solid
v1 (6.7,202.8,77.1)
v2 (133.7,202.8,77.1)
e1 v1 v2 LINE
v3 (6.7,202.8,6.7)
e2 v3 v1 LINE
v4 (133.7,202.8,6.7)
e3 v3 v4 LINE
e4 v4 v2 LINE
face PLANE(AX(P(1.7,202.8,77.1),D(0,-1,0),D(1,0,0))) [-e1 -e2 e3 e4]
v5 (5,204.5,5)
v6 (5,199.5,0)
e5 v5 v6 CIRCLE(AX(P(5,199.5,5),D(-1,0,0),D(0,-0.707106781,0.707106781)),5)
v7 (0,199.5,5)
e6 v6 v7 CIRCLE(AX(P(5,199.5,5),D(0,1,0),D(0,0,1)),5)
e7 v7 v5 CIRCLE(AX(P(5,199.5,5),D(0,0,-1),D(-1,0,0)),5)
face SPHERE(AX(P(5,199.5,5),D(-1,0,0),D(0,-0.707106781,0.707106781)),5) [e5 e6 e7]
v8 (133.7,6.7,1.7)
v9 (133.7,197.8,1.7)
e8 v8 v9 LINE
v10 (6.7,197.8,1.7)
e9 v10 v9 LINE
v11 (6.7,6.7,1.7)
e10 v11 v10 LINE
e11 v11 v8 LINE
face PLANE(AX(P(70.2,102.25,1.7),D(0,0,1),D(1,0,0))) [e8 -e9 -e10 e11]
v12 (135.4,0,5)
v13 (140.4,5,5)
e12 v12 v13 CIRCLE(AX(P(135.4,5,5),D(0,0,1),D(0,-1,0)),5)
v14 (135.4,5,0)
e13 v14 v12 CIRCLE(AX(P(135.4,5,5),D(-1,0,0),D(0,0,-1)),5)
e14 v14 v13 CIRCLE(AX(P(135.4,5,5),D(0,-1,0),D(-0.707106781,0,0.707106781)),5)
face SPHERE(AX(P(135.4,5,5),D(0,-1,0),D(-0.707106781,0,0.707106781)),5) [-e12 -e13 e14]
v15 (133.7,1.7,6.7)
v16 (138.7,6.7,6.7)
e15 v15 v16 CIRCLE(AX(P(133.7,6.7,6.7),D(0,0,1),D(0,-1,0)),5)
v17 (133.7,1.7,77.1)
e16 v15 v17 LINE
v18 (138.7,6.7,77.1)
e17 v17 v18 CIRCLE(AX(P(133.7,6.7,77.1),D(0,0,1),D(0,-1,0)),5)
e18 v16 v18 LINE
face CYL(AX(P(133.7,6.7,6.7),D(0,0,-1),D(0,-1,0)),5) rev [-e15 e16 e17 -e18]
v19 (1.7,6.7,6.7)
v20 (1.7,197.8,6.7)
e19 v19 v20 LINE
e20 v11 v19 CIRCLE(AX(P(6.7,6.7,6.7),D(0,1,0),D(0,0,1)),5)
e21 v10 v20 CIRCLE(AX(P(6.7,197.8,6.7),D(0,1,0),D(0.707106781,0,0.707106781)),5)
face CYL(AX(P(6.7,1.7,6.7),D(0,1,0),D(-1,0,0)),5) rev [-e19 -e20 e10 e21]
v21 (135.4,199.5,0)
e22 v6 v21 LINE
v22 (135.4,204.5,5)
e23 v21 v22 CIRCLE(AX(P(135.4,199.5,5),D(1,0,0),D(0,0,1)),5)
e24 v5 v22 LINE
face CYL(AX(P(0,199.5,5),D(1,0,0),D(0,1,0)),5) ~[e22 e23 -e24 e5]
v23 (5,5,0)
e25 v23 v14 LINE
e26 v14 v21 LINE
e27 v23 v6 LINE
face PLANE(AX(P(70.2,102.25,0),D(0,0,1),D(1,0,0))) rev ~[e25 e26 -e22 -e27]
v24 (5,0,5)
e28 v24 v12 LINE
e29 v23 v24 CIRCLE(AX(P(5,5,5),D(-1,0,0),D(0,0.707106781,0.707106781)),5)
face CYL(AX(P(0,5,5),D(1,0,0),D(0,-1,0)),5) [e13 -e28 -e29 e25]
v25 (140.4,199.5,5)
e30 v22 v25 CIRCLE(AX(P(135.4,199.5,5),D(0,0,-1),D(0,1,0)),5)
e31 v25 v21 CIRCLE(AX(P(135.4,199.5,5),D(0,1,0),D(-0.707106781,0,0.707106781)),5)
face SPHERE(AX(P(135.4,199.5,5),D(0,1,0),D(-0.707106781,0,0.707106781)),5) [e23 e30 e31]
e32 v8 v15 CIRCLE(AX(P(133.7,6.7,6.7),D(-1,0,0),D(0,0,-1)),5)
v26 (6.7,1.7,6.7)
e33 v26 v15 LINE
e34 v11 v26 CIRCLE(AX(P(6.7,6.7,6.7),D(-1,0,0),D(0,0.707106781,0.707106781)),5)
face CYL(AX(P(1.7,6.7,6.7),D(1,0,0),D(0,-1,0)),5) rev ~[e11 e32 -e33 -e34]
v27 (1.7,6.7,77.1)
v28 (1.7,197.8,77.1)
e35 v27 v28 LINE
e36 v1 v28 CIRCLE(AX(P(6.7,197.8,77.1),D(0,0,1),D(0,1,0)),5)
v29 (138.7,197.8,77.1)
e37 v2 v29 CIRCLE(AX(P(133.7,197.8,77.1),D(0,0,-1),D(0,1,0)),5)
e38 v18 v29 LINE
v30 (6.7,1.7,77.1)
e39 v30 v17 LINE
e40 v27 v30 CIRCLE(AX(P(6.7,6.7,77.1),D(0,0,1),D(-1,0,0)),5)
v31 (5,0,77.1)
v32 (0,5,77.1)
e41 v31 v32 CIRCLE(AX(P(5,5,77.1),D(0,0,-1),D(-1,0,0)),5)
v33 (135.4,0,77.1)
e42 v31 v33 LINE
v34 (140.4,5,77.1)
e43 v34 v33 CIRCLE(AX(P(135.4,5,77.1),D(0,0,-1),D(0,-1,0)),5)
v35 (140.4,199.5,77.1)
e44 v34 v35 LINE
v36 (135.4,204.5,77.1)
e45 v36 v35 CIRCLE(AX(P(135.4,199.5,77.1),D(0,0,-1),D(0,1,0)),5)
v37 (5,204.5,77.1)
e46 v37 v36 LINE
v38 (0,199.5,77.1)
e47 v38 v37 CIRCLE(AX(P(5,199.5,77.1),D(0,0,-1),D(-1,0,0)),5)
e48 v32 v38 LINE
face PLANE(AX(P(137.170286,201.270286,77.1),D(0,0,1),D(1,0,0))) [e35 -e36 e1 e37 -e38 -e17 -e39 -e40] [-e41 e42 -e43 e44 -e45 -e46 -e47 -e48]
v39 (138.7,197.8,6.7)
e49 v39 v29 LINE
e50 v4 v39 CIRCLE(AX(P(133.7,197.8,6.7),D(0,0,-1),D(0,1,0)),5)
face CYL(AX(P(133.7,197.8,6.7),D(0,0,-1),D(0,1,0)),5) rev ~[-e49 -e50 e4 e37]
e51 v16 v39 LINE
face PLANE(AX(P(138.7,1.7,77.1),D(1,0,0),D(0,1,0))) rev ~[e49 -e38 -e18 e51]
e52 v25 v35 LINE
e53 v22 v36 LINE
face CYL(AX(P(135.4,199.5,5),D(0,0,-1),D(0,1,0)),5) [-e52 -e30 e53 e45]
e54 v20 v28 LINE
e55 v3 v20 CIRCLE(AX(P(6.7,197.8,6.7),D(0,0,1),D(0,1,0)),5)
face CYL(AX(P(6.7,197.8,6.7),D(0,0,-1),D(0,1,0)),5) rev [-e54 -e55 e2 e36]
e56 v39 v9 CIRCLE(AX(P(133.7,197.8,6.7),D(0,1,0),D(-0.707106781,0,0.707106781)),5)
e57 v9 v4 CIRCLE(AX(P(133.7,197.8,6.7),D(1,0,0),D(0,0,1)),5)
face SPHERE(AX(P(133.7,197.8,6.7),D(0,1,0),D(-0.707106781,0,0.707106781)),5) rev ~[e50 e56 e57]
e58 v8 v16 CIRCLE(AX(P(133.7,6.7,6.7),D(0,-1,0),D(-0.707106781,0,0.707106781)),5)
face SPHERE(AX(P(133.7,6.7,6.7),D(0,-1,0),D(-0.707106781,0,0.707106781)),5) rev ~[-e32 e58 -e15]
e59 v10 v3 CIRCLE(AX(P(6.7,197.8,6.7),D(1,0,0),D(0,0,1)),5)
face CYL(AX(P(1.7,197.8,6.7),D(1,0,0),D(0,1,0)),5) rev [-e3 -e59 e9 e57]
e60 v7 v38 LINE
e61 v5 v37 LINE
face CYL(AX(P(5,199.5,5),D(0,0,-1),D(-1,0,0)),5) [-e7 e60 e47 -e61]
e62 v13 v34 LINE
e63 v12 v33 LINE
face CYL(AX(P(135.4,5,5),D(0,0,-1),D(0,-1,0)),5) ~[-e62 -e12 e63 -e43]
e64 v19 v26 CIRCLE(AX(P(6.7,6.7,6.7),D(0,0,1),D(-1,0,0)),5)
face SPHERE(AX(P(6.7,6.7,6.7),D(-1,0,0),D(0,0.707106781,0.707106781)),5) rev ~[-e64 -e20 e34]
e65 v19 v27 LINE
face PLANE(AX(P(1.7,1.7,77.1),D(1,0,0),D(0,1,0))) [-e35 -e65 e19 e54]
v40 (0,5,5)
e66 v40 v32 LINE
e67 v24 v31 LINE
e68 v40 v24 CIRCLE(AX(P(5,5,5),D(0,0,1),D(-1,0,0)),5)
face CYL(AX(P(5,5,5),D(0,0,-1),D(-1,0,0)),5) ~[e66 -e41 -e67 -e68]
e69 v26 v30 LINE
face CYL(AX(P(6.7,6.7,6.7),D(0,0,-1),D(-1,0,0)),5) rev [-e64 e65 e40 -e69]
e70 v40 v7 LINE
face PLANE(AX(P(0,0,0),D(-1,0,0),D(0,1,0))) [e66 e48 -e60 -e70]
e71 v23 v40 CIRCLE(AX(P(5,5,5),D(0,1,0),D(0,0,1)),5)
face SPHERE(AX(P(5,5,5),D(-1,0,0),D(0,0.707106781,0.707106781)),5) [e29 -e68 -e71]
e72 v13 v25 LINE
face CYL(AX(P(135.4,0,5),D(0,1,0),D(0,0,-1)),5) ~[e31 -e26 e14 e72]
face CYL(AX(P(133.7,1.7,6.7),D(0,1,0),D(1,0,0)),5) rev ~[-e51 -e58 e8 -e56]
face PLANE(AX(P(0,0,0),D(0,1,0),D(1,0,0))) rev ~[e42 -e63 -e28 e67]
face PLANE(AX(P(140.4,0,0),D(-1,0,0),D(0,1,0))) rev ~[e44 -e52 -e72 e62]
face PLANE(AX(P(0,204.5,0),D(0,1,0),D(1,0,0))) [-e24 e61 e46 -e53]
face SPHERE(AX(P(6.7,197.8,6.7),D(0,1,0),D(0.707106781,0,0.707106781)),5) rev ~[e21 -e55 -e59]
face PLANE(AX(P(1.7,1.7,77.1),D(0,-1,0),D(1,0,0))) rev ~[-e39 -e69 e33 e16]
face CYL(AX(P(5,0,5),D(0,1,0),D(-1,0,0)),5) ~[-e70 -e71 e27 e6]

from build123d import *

# Parameters (mm, degrees)
F0_W         = 140.4
F0_H         = 204.5
F1_DEPTH     = 77.1
F2_W         = 137
F2_H         = 201.1
F3_DEPTH     = 75.4
F4_R         = 5
F5_T1_DEPTH  = 70.4
F5_S5_W      = 5
F5_S5_H      = 5
F5_T6_DEPTH  = 5
F5_S11_W     = 5
F5_S11_H     = 5
F5_T12_DEPTH = 5
F5_S17_W     = 5
F5_S17_H     = 5
F5_T18_DEPTH = 5
F5_S23_W     = 5
F5_S23_H     = 5
F5_T24_DEPTH = 5
F5_T27_DEPTH = 84.6
F5_S31_W     = 5
F5_S31_H     = 5
F5_T32_DEPTH = 5
F5_S37_W     = 5
F5_S37_H     = 5
F5_T38_DEPTH = 5
F5_S43_W     = 5
F5_S43_H     = 5
F5_T44_DEPTH = 5
F5_S49_W     = 5
F5_S49_H     = 5
F5_T50_DEPTH = 5


# Not quite as in the source:
# - a fillet or chamfer that OpenCascade refuses, or shapes differently, is made with other operations: its cross-section is extruded or revolved along the edge and cut away or added


with BuildPart() as f1:
    # F0 (on Top) → F1 (new body)
    with BuildSketch(Plane.XY):
        with Locations((70.2, 102.25)):
            Rectangle(F0_W, F0_H)
    extrude(amount=F1_DEPTH)

    # F2 (on face) → F3 (cut)
    with BuildSketch(Plane.XY.offset(77.1)):
        with Locations((70.2, 102.25)):
            Rectangle(F2_W, F2_H)
    extrude(amount=-F3_DEPTH, mode=Mode.SUBTRACT)

    # F4
    f4_edges = [f1.edges().sort_by_distance(p)[0] for p in [
        (70.2, 202.8, 1.7),
        (1.7, 102.25, 1.7),
        (70.2, 1.7, 1.7),
        (138.7, 102.25, 1.7),
        (0, 102.25, 0),
        (70.2, 0, 0),
        (140.4, 102.25, 0),
        (70.2, 204.5, 0),
    ]]
    fillet(f4_edges, radius=F4_R)

    # F5: fillet of radius 5 on 8 edges, made by hand

    # F5_s2 → F5_t1 (join)
    with BuildSketch(Plane.XY.offset(6.7)):
        with BuildLine():
            ThreePointArc((133.7, 202.8), (137.2355339059, 201.3355339059), (138.7, 197.8))
            Line((138.7, 197.8), (138.7, 202.8))
            Line((138.7, 202.8), (133.7, 202.8))
        make_face()
        with BuildLine():
            ThreePointArc((6.7, 202.8), (3.1644660941, 201.3355339059), (1.7, 197.8))
            Line((1.7, 197.8), (1.7, 202.8))
            Line((1.7, 202.8), (6.7, 202.8))
        make_face()
        with BuildLine():
            ThreePointArc((1.7, 6.7), (3.1644660941, 3.1644660941), (6.7, 1.7))
            Line((6.7, 1.7), (1.7, 1.7))
            Line((1.7, 1.7), (1.7, 6.7))
        make_face()
        with BuildLine():
            ThreePointArc((133.7, 1.7), (137.2355339059, 3.1644660941), (138.7, 6.7))
            Line((138.7, 6.7), (138.7, 1.7))
            Line((138.7, 1.7), (133.7, 1.7))
        make_face()
    extrude(amount=F5_T1_DEPTH)


with BuildPart() as f5_tool4:
    # F5_s5 → F5_t6 (new body)
    with BuildSketch(Plane.XZ.offset(-6.7)):
        with Locations((136.2, 4.2)):
            Rectangle(F5_S5_W, F5_S5_H)
    extrude(amount=F5_T6_DEPTH)

    # F5_s7 → F5_t8 (revolve, cut)
    with BuildSketch(Plane(origin=(133.7, 6.7, 6.7), x_dir=(-0.7071067812, 0, 0.7071067812), z_dir=(0.7071067812, 0, 0.7071067812))):
        with BuildLine():
            ThreePointArc((0, -5), (5, 0), (0, 5))
            Line((0, 5), (0, -5))
        make_face()
    revolve(axis=Axis((133.7, 6.7, 6.7), (0, -1, 0)), mode=Mode.SUBTRACT)


with BuildPart() as f1_1:
    add(f1.part)

    # F5_t3: union F5_tool4
    add(f5_tool4.part)


with BuildPart() as f5_tool10:
    # F5_s11 → F5_t12 (new body)
    with BuildSketch(Plane.YZ.offset(6.7)):
        with Locations((4.2, 4.2)):
            Rectangle(F5_S11_W, F5_S11_H)
    extrude(amount=-F5_T12_DEPTH)

    # F5_s13 → F5_t14 (revolve, cut)
    with BuildSketch(Plane(origin=(6.7, 6.7, 6.7), x_dir=(0, 0.7071067812, 0.7071067812), z_dir=(0, -0.7071067812, 0.7071067812))):
        with BuildLine():
            ThreePointArc((0, -5), (5, 0), (0, 5))
            Line((0, 5), (0, -5))
        make_face()
    revolve(axis=Axis((6.7, 6.7, 6.7), (-1, 0, 0)), mode=Mode.SUBTRACT)


with BuildPart() as f1_2:
    add(f1_1.part)

    # F5_t9: union F5_tool10
    add(f5_tool10.part)


with BuildPart() as f5_tool16:
    # F5_s17 → F5_t18 (new body)
    with BuildSketch(Plane.XZ.offset(-197.8)):
        with Locations((4.2, 4.2)):
            Rectangle(F5_S17_W, F5_S17_H)
    extrude(amount=-F5_T18_DEPTH)

    # F5_s19 → F5_t20 (revolve, cut)
    with BuildSketch(Plane(origin=(6.7, 197.8, 6.7), x_dir=(0.7071067812, 0, 0.7071067812), z_dir=(-0.7071067812, 0, 0.7071067812))):
        with BuildLine():
            ThreePointArc((0, -5), (5, 0), (0, 5))
            Line((0, 5), (0, -5))
        make_face()
    revolve(axis=Axis((6.7, 197.8, 6.7), (0, 1, 0)), mode=Mode.SUBTRACT)


with BuildPart() as f1_3:
    add(f1_2.part)

    # F5_t15: union F5_tool16
    add(f5_tool16.part)


with BuildPart() as f5_tool22:
    # F5_s23 → F5_t24 (new body)
    with BuildSketch(Plane.XZ.offset(-197.8)):
        with Locations((136.2, 4.2)):
            Rectangle(F5_S23_W, F5_S23_H)
    extrude(amount=-F5_T24_DEPTH)

    # F5_s25 → F5_t26 (revolve, cut)
    with BuildSketch(Plane(origin=(133.7, 197.8, 6.7), x_dir=(-0.7071067812, 0, 0.7071067812), z_dir=(-0.7071067812, 0, -0.7071067812))):
        with BuildLine():
            ThreePointArc((0, -5), (5, 0), (0, 5))
            Line((0, 5), (0, -5))
        make_face()
    revolve(axis=Axis((133.7, 197.8, 6.7), (0, 1, 0)), mode=Mode.SUBTRACT)


with BuildPart() as f1_4:
    add(f1_3.part)

    # F5_t21: union F5_tool22
    add(f5_tool22.part)

    # F5_s28 → F5_t27 (cut)
    with BuildSketch(Plane.XY.offset(5)):
        with BuildLine():
            ThreePointArc((0, 5), (1.4644660941, 1.4644660941), (5, 0))
            Line((5, 0), (0, 0))
            Line((0, 0), (0, 5))
        make_face()
        with BuildLine():
            ThreePointArc((135.4, 0), (138.9355339059, 1.4644660941), (140.4, 5))
            Line((140.4, 5), (140.4, 0))
            Line((140.4, 0), (135.4, 0))
        make_face()
        with BuildLine():
            ThreePointArc((135.4, 204.5), (138.9355339059, 203.0355339059), (140.4, 199.5))
            Line((140.4, 199.5), (140.4, 204.5))
            Line((140.4, 204.5), (135.4, 204.5))
        make_face()
        with BuildLine():
            ThreePointArc((0, 199.5), (1.4644660941, 203.0355339059), (5, 204.5))
            Line((5, 204.5), (0, 204.5))
            Line((0, 204.5), (0, 199.5))
        make_face()
    extrude(amount=F5_T27_DEPTH, mode=Mode.SUBTRACT)


with BuildPart() as f5_tool30:
    # F5_s31 → F5_t32 (new body)
    with BuildSketch(Plane.YZ.offset(5)):
        with Locations((202, 2.5)):
            Rectangle(F5_S31_W, F5_S31_H)
    extrude(amount=-F5_T32_DEPTH)

    # F5_s33 → F5_t34 (revolve, cut)
    with BuildSketch(Plane(origin=(5, 199.5, 5), x_dir=(0, -0.7071067812, 0.7071067812), z_dir=(0, -0.7071067812, -0.7071067812))):
        with BuildLine():
            ThreePointArc((0, -5), (5, 0), (0, 5))
            Line((0, 5), (0, -5))
        make_face()
    revolve(axis=Axis((5, 199.5, 5), (-1, 0, 0)), mode=Mode.SUBTRACT)


with BuildPart() as f1_5:
    add(f1_4.part)

    # F5_t29: cut F5_tool30
    add(f5_tool30.part, mode=Mode.SUBTRACT)


with BuildPart() as f5_tool36:
    # F5_s37 → F5_t38 (new body)
    with BuildSketch(Plane.XZ.offset(-199.5)):
        with Locations((137.9, 2.5)):
            Rectangle(F5_S37_W, F5_S37_H)
    extrude(amount=-F5_T38_DEPTH)

    # F5_s39 → F5_t40 (revolve, cut)
    with BuildSketch(Plane(origin=(135.4, 199.5, 5), x_dir=(-0.7071067812, 0, 0.7071067812), z_dir=(-0.7071067812, 0, -0.7071067812))):
        with BuildLine():
            ThreePointArc((0, -5), (5, 0), (0, 5))
            Line((0, 5), (0, -5))
        make_face()
    revolve(axis=Axis((135.4, 199.5, 5), (0, 1, 0)), mode=Mode.SUBTRACT)


with BuildPart() as f1_6:
    add(f1_5.part)

    # F5_t35: cut F5_tool36
    add(f5_tool36.part, mode=Mode.SUBTRACT)


with BuildPart() as f5_tool42:
    # F5_s43 → F5_t44 (new body)
    with BuildSketch(Plane.XZ.offset(-5)):
        with Locations((137.9, 2.5)):
            Rectangle(F5_S43_W, F5_S43_H)
    extrude(amount=F5_T44_DEPTH)

    # F5_s45 → F5_t46 (revolve, cut)
    with BuildSketch(Plane(origin=(135.4, 5, 5), x_dir=(-0.7071067812, 0, 0.7071067812), z_dir=(0.7071067812, 0, 0.7071067812))):
        with BuildLine():
            ThreePointArc((0, -5), (5, 0), (0, 5))
            Line((0, 5), (0, -5))
        make_face()
    revolve(axis=Axis((135.4, 5, 5), (0, -1, 0)), mode=Mode.SUBTRACT)


with BuildPart() as f1_7:
    add(f1_6.part)

    # F5_t41: cut F5_tool42
    add(f5_tool42.part, mode=Mode.SUBTRACT)


with BuildPart() as f5_tool48:
    # F5_s49 → F5_t50 (new body)
    with BuildSketch(Plane.YZ.offset(5)):
        with Locations((2.5, 2.5)):
            Rectangle(F5_S49_W, F5_S49_H)
    extrude(amount=-F5_T50_DEPTH)

    # F5_s51 → F5_t52 (revolve, cut)
    with BuildSketch(Plane(origin=(5, 5, 5), x_dir=(0, 0.7071067812, 0.7071067812), z_dir=(0, -0.7071067812, 0.7071067812))):
        with BuildLine():
            ThreePointArc((0, -5), (5, 0), (0, 5))
            Line((0, 5), (0, -5))
        make_face()
    revolve(axis=Axis((5, 5, 5), (-1, 0, 0)), mode=Mode.SUBTRACT)


with BuildPart() as f1_8:
    add(f1_7.part)

    # F5_t47: cut F5_tool48
    add(f5_tool48.part, mode=Mode.SUBTRACT)


solid = f1_8.part
